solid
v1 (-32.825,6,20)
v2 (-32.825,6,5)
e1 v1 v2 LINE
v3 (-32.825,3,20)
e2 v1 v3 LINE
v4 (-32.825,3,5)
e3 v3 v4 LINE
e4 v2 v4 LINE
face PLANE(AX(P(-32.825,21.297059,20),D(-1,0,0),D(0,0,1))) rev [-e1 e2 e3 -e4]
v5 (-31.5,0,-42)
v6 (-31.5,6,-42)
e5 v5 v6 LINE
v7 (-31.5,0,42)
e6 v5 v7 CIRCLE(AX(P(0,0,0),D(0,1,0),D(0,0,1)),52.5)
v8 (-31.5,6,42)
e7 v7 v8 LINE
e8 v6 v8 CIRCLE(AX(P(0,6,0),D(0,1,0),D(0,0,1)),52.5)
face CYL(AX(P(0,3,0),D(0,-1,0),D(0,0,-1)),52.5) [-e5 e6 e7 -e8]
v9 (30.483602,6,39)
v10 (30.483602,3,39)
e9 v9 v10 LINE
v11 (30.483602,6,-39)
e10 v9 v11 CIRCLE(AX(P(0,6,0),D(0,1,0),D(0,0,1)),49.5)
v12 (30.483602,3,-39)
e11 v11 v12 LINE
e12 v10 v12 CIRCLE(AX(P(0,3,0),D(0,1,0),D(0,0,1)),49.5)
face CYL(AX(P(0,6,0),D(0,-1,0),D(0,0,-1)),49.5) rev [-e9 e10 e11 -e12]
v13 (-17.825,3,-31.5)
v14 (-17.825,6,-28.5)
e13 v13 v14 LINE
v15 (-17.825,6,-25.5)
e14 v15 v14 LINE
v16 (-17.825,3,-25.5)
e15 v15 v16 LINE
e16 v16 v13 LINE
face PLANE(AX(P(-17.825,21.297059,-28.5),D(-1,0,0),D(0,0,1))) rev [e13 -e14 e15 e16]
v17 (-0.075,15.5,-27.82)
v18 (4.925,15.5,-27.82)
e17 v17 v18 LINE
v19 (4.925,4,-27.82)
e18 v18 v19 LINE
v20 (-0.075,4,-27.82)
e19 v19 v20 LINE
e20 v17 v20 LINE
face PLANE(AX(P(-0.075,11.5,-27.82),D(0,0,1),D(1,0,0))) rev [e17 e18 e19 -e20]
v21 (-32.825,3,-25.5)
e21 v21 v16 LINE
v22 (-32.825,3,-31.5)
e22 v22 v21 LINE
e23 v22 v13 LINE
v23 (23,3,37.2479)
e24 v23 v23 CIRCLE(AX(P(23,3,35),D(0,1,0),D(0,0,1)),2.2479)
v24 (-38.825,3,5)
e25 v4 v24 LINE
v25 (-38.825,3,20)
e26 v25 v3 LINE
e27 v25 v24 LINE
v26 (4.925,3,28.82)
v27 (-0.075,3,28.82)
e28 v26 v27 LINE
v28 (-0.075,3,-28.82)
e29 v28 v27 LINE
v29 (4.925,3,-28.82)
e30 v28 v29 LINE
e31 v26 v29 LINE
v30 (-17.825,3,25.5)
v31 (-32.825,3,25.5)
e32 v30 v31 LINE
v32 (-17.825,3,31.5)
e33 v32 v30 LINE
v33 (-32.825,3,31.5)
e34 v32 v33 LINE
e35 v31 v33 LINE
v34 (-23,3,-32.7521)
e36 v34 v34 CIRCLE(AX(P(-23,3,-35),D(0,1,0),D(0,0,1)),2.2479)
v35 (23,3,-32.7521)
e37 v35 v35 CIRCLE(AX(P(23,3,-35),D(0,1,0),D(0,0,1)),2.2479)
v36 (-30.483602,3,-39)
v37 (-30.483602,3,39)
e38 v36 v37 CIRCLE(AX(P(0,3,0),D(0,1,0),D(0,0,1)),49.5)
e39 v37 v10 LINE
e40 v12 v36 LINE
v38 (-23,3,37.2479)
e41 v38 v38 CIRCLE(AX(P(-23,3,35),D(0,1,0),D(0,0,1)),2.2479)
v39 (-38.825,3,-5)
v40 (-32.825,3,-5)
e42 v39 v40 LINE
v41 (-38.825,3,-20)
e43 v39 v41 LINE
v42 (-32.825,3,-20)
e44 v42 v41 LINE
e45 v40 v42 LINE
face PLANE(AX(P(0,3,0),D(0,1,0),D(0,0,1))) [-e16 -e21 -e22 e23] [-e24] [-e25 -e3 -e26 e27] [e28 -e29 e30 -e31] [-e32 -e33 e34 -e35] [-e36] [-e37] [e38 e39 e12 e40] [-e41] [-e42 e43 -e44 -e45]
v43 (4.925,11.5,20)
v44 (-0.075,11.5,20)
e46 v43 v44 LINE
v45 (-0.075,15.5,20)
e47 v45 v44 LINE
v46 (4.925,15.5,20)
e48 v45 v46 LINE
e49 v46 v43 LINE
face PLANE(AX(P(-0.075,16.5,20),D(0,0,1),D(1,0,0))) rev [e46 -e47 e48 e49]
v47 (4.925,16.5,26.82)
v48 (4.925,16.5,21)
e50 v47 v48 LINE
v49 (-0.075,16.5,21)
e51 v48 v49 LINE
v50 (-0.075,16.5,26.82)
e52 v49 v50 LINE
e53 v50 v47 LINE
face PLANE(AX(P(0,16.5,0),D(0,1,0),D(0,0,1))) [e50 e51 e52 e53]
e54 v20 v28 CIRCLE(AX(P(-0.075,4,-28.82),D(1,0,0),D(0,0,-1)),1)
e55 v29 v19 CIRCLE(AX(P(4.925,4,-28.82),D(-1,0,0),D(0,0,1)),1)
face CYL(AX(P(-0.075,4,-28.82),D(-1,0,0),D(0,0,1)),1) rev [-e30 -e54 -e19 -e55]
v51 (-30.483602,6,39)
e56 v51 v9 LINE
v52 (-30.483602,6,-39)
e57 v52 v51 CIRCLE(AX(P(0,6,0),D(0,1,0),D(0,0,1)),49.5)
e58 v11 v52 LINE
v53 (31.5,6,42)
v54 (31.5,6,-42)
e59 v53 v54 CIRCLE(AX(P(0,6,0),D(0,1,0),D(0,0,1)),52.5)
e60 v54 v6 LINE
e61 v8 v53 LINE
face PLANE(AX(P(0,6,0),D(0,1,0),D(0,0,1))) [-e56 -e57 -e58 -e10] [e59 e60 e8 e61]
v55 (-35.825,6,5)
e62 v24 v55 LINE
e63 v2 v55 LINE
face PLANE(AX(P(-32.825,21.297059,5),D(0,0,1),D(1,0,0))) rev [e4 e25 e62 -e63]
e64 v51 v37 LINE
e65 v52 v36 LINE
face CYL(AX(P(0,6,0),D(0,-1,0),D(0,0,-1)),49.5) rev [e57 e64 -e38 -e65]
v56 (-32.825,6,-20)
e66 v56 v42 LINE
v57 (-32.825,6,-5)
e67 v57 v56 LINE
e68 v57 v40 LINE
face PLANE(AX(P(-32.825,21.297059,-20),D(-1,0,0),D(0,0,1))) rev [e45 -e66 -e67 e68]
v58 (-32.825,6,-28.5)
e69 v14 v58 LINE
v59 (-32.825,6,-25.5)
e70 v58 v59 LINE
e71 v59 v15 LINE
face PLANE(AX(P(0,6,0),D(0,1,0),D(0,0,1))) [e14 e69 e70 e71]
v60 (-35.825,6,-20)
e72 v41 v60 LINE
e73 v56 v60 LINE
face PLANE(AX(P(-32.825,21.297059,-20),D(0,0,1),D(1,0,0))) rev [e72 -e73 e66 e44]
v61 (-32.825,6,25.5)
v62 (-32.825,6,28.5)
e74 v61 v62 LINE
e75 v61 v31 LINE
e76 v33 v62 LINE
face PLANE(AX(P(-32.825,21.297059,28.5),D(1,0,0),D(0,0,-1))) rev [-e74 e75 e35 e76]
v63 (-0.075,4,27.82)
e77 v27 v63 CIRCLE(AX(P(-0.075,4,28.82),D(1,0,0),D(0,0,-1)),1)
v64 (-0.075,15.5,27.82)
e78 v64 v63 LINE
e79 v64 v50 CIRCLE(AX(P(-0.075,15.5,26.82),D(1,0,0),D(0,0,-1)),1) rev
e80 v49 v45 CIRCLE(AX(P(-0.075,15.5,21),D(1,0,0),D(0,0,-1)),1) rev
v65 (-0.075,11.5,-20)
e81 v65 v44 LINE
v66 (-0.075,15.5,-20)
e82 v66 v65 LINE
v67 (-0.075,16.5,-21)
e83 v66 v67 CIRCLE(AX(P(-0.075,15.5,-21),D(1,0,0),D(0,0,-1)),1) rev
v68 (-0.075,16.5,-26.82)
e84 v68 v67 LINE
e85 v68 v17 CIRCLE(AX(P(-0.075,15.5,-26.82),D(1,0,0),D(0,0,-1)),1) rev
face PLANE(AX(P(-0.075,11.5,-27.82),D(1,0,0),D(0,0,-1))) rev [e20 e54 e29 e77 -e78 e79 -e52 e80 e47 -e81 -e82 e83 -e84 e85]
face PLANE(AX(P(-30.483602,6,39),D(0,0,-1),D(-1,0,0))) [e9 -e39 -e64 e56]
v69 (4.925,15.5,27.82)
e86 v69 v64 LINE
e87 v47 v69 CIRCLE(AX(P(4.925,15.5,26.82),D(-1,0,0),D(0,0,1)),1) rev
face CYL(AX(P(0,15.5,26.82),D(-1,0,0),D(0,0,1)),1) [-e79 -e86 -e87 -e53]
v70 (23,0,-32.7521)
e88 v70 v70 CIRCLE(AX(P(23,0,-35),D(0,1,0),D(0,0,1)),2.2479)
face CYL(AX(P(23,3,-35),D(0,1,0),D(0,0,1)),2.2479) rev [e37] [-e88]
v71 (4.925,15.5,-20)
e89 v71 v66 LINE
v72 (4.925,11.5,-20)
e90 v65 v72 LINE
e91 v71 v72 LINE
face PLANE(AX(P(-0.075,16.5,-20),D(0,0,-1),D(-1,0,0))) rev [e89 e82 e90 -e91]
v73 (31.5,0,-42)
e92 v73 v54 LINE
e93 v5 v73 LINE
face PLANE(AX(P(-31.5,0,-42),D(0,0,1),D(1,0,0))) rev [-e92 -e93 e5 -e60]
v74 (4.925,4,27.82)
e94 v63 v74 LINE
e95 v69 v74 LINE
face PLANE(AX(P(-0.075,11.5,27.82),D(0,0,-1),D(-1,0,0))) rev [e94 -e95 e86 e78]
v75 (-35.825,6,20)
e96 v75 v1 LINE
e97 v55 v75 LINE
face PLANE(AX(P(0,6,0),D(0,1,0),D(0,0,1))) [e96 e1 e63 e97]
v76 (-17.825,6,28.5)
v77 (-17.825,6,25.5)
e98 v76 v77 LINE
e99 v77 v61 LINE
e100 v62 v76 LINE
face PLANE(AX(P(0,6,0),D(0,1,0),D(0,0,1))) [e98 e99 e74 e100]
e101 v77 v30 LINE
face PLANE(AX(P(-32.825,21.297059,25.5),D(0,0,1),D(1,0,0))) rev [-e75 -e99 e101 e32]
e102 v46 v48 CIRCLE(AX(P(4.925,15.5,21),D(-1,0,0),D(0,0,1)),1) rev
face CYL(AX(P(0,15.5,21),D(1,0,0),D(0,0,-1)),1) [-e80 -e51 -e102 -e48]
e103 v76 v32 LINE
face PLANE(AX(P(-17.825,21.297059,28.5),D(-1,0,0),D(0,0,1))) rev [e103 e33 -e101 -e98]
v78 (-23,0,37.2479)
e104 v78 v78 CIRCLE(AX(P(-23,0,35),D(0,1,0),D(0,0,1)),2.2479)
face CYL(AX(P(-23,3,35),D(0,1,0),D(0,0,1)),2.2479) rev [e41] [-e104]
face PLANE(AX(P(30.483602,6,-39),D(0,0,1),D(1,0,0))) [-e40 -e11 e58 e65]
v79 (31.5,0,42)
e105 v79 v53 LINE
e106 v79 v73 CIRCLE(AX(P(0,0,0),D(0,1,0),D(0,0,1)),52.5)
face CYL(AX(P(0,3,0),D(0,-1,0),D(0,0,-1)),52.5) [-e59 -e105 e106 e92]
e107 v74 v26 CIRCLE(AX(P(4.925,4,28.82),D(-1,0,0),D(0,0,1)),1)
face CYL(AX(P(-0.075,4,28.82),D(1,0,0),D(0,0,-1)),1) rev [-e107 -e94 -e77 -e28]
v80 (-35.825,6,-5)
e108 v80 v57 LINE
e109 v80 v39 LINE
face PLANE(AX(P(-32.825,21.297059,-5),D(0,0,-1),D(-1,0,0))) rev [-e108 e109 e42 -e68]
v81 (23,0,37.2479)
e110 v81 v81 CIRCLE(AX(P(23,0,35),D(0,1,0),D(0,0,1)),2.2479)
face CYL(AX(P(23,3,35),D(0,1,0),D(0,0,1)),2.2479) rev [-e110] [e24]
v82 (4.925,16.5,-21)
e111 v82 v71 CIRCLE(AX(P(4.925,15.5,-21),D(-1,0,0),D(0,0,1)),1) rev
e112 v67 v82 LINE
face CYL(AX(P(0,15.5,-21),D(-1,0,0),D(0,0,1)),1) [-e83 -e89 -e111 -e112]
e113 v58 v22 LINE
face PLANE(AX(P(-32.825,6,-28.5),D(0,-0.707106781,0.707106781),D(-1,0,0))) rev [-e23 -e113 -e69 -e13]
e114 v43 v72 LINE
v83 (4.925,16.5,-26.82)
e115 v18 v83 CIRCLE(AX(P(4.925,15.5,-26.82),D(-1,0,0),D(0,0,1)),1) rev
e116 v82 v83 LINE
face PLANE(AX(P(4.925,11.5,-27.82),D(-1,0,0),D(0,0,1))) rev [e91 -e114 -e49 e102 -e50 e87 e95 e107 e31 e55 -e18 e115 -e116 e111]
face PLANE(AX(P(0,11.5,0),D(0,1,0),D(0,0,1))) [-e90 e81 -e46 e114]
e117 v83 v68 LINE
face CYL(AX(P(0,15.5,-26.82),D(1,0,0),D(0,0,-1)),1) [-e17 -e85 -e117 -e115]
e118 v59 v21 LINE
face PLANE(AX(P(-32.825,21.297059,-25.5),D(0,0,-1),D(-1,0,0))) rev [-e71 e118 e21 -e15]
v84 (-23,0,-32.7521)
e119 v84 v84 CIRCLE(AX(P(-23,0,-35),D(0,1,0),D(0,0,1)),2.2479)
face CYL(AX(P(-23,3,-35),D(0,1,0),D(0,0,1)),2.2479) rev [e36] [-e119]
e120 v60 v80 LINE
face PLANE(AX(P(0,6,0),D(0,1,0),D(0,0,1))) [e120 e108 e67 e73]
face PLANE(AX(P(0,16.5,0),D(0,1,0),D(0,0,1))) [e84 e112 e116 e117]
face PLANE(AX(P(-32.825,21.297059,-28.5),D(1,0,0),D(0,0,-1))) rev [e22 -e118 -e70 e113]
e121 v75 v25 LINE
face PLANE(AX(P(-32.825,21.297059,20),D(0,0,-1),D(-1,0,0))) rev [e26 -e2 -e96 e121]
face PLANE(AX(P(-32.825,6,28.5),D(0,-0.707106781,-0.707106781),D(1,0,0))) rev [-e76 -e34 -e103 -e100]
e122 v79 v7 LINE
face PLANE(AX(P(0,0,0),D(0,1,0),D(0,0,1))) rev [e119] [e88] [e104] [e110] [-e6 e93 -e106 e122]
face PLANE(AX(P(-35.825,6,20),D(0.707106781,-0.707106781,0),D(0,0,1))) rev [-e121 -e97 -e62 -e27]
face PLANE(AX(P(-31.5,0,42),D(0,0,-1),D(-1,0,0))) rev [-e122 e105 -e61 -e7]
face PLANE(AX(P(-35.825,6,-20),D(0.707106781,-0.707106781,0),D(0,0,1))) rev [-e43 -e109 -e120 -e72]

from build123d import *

# Parameters (mm, degrees)
A_BASE_T42_OUTLINE_R        = 2.2479
A_BASE_T42_OUTLINE_R_2      = 1
A_BASE_T42_DEPTH            = 3
OUTER_BRIM_DEPTH            = 3
SKETCH5_W                   = 3
SKETCH5_H                   = 15
SKETCH5_W_2                 = 15
SKETCH5_H_2                 = 3
BASE_SUPPORTS_DEPTH         = 3
BASE_SUPPORTS_CHAMFER_SIZE  = 3
COVER_START                 = -3
SKETCH6_R                   = 1
COVER_DEPTH                 = 3
SKETCH7_W                   = 5
SKETCH7_H                   = 55.64
SERVO_SIDE_SUPPORTS_DEPTH   = 8.5
SKETCH8_W                   = 5
SKETCH8_H                   = 7.82
SERVO_SIDE_EXTENSIONS_DEPTH = 5
SERVO_CONTOURING_R          = 1


# Read off the part's stored shape, not the designer's step: a_base_t42
with BuildPart() as part:
    # a_base_t42 outline → a_base_t42 (new body)
    with BuildSketch(Plane(origin=(0, 0, 0), x_dir=(1, 0, 0), z_dir=(0, 1, 0))):
        with BuildLine():
            ThreePointArc((31.5, -42), (52.5, 0), (31.5, 42))
            Line((31.5, 42), (-31.5, 42))
            ThreePointArc((-31.5, 42), (-52.5, 0), (-31.5, -42))
            Line((-31.5, -42), (31.5, -42))
        make_face()
        with Locations((-23, -35)):
            Circle(A_BASE_T42_OUTLINE_R, mode=Mode.SUBTRACT)
        with Locations((23, -35)):
            Circle(A_BASE_T42_OUTLINE_R, mode=Mode.SUBTRACT)
        with Locations((-40.25, 0)):
            Circle(A_BASE_T42_OUTLINE_R_2, mode=Mode.SUBTRACT)
        with Locations((-23, 35)):
            Circle(A_BASE_T42_OUTLINE_R, mode=Mode.SUBTRACT)
        with Locations((40.25, 0)):
            Circle(A_BASE_T42_OUTLINE_R_2, mode=Mode.SUBTRACT)
        with Locations((23, 35)):
            Circle(A_BASE_T42_OUTLINE_R, mode=Mode.SUBTRACT)
    extrude(amount=A_BASE_T42_DEPTH)

    # Sketch1 → Outer Brim (add)
    with BuildSketch(Plane(origin=(0, 3, 0), x_dir=(1, 0, 0), z_dir=(0, 1, 0))):
        with BuildLine():
            Line((-31.5, -42), (31.5, -42))
            ThreePointArc((31.5, -42), (52.5, 0), (31.5, 42))
            Line((31.5, 42), (-31.5, 42))
            ThreePointArc((-31.5, 42), (-52.5, 0), (-31.5, -42))
        make_face()
        with BuildLine():
            Line((30.483602149, 39), (-30.483602149, 39))
            ThreePointArc((-30.483602149, 39), (-49.5, 0), (-30.483602149, -39))
            Line((-30.483602149, -39), (30.483602149, -39))
            ThreePointArc((30.483602149, -39), (49.5, 0), (30.483602149, 39))
        make_face(mode=Mode.SUBTRACT)
    extrude(amount=OUTER_BRIM_DEPTH)

    # Sketch5 → Base Supports (add)
    with BuildSketch(Plane(origin=(0, 3, 0), x_dir=(1, 0, 0), z_dir=(0, 1, 0))):
        with Locations((-34.325, -12.5)):
            Rectangle(SKETCH5_W, SKETCH5_H)
        with Locations((-34.325, 12.5)):
            Rectangle(SKETCH5_W, SKETCH5_H)
        with Locations((-25.325, -27)):
            Rectangle(SKETCH5_W_2, SKETCH5_H_2)
        with Locations((-25.325, 27)):
            Rectangle(SKETCH5_W_2, SKETCH5_H_2)
    extrude(amount=BASE_SUPPORTS_DEPTH)

    # Base Supports Chamfer
    base_supports_chamfer_edges = [part.edges().sort_by_distance(p)[0] for p in [
        (-25.325, 3, 28.5),
        (-25.325, 3, -28.5),
        (-35.825, 3, 12.5),
        (-35.825, 3, -12.5),
    ]]
    chamfer(base_supports_chamfer_edges, length=BASE_SUPPORTS_CHAMFER_SIZE - 0.0001)  # a hair under: the kernel refuses the full size

    # Sketch6 → Cover (add)
    with BuildSketch(Plane(origin=(0, 3, 0), x_dir=(1, 0, 0), z_dir=(0, 1, 0)).offset(COVER_START)):
        with Locations((-40.25, 0)):
            Circle(SKETCH6_R)
        with Locations((40.25, 0)):
            Circle(SKETCH6_R)
    extrude(amount=COVER_DEPTH)

    # Sketch7 → Servo Side Supports (add)
    with BuildSketch(Plane(origin=(0, 3, 0), x_dir=(1, 0, 0), z_dir=(0, 1, 0))):
        with Locations((2.425, 0)):
            Rectangle(SKETCH7_W, SKETCH7_H)
    extrude(amount=SERVO_SIDE_SUPPORTS_DEPTH)

    # Sketch8 → Servo Side Extensions (add)
    with BuildSketch(Plane(origin=(0, 11.5, 0), x_dir=(1, 0, 0), z_dir=(0, 1, 0))):
        with Locations((2.425, 23.91)):
            Rectangle(SKETCH8_W, SKETCH8_H)
        with Locations((2.425, -23.91)):
            Rectangle(SKETCH8_W, SKETCH8_H)
    extrude(amount=SERVO_SIDE_EXTENSIONS_DEPTH)

    # Servo Contouring
    servo_contouring_edges = [part.edges().sort_by_distance(p)[0] for p in [
        (2.425, 3, -27.82),
        (2.425, 16.5, -27.82),
        (2.425, 3, 27.82),
        (2.425, 16.5, 27.82),
        (2.425, 16.5, 20),
        (2.425, 16.5, -20),
    ]]
    fillet(servo_contouring_edges, radius=SERVO_CONTOURING_R)


solid = part.part
